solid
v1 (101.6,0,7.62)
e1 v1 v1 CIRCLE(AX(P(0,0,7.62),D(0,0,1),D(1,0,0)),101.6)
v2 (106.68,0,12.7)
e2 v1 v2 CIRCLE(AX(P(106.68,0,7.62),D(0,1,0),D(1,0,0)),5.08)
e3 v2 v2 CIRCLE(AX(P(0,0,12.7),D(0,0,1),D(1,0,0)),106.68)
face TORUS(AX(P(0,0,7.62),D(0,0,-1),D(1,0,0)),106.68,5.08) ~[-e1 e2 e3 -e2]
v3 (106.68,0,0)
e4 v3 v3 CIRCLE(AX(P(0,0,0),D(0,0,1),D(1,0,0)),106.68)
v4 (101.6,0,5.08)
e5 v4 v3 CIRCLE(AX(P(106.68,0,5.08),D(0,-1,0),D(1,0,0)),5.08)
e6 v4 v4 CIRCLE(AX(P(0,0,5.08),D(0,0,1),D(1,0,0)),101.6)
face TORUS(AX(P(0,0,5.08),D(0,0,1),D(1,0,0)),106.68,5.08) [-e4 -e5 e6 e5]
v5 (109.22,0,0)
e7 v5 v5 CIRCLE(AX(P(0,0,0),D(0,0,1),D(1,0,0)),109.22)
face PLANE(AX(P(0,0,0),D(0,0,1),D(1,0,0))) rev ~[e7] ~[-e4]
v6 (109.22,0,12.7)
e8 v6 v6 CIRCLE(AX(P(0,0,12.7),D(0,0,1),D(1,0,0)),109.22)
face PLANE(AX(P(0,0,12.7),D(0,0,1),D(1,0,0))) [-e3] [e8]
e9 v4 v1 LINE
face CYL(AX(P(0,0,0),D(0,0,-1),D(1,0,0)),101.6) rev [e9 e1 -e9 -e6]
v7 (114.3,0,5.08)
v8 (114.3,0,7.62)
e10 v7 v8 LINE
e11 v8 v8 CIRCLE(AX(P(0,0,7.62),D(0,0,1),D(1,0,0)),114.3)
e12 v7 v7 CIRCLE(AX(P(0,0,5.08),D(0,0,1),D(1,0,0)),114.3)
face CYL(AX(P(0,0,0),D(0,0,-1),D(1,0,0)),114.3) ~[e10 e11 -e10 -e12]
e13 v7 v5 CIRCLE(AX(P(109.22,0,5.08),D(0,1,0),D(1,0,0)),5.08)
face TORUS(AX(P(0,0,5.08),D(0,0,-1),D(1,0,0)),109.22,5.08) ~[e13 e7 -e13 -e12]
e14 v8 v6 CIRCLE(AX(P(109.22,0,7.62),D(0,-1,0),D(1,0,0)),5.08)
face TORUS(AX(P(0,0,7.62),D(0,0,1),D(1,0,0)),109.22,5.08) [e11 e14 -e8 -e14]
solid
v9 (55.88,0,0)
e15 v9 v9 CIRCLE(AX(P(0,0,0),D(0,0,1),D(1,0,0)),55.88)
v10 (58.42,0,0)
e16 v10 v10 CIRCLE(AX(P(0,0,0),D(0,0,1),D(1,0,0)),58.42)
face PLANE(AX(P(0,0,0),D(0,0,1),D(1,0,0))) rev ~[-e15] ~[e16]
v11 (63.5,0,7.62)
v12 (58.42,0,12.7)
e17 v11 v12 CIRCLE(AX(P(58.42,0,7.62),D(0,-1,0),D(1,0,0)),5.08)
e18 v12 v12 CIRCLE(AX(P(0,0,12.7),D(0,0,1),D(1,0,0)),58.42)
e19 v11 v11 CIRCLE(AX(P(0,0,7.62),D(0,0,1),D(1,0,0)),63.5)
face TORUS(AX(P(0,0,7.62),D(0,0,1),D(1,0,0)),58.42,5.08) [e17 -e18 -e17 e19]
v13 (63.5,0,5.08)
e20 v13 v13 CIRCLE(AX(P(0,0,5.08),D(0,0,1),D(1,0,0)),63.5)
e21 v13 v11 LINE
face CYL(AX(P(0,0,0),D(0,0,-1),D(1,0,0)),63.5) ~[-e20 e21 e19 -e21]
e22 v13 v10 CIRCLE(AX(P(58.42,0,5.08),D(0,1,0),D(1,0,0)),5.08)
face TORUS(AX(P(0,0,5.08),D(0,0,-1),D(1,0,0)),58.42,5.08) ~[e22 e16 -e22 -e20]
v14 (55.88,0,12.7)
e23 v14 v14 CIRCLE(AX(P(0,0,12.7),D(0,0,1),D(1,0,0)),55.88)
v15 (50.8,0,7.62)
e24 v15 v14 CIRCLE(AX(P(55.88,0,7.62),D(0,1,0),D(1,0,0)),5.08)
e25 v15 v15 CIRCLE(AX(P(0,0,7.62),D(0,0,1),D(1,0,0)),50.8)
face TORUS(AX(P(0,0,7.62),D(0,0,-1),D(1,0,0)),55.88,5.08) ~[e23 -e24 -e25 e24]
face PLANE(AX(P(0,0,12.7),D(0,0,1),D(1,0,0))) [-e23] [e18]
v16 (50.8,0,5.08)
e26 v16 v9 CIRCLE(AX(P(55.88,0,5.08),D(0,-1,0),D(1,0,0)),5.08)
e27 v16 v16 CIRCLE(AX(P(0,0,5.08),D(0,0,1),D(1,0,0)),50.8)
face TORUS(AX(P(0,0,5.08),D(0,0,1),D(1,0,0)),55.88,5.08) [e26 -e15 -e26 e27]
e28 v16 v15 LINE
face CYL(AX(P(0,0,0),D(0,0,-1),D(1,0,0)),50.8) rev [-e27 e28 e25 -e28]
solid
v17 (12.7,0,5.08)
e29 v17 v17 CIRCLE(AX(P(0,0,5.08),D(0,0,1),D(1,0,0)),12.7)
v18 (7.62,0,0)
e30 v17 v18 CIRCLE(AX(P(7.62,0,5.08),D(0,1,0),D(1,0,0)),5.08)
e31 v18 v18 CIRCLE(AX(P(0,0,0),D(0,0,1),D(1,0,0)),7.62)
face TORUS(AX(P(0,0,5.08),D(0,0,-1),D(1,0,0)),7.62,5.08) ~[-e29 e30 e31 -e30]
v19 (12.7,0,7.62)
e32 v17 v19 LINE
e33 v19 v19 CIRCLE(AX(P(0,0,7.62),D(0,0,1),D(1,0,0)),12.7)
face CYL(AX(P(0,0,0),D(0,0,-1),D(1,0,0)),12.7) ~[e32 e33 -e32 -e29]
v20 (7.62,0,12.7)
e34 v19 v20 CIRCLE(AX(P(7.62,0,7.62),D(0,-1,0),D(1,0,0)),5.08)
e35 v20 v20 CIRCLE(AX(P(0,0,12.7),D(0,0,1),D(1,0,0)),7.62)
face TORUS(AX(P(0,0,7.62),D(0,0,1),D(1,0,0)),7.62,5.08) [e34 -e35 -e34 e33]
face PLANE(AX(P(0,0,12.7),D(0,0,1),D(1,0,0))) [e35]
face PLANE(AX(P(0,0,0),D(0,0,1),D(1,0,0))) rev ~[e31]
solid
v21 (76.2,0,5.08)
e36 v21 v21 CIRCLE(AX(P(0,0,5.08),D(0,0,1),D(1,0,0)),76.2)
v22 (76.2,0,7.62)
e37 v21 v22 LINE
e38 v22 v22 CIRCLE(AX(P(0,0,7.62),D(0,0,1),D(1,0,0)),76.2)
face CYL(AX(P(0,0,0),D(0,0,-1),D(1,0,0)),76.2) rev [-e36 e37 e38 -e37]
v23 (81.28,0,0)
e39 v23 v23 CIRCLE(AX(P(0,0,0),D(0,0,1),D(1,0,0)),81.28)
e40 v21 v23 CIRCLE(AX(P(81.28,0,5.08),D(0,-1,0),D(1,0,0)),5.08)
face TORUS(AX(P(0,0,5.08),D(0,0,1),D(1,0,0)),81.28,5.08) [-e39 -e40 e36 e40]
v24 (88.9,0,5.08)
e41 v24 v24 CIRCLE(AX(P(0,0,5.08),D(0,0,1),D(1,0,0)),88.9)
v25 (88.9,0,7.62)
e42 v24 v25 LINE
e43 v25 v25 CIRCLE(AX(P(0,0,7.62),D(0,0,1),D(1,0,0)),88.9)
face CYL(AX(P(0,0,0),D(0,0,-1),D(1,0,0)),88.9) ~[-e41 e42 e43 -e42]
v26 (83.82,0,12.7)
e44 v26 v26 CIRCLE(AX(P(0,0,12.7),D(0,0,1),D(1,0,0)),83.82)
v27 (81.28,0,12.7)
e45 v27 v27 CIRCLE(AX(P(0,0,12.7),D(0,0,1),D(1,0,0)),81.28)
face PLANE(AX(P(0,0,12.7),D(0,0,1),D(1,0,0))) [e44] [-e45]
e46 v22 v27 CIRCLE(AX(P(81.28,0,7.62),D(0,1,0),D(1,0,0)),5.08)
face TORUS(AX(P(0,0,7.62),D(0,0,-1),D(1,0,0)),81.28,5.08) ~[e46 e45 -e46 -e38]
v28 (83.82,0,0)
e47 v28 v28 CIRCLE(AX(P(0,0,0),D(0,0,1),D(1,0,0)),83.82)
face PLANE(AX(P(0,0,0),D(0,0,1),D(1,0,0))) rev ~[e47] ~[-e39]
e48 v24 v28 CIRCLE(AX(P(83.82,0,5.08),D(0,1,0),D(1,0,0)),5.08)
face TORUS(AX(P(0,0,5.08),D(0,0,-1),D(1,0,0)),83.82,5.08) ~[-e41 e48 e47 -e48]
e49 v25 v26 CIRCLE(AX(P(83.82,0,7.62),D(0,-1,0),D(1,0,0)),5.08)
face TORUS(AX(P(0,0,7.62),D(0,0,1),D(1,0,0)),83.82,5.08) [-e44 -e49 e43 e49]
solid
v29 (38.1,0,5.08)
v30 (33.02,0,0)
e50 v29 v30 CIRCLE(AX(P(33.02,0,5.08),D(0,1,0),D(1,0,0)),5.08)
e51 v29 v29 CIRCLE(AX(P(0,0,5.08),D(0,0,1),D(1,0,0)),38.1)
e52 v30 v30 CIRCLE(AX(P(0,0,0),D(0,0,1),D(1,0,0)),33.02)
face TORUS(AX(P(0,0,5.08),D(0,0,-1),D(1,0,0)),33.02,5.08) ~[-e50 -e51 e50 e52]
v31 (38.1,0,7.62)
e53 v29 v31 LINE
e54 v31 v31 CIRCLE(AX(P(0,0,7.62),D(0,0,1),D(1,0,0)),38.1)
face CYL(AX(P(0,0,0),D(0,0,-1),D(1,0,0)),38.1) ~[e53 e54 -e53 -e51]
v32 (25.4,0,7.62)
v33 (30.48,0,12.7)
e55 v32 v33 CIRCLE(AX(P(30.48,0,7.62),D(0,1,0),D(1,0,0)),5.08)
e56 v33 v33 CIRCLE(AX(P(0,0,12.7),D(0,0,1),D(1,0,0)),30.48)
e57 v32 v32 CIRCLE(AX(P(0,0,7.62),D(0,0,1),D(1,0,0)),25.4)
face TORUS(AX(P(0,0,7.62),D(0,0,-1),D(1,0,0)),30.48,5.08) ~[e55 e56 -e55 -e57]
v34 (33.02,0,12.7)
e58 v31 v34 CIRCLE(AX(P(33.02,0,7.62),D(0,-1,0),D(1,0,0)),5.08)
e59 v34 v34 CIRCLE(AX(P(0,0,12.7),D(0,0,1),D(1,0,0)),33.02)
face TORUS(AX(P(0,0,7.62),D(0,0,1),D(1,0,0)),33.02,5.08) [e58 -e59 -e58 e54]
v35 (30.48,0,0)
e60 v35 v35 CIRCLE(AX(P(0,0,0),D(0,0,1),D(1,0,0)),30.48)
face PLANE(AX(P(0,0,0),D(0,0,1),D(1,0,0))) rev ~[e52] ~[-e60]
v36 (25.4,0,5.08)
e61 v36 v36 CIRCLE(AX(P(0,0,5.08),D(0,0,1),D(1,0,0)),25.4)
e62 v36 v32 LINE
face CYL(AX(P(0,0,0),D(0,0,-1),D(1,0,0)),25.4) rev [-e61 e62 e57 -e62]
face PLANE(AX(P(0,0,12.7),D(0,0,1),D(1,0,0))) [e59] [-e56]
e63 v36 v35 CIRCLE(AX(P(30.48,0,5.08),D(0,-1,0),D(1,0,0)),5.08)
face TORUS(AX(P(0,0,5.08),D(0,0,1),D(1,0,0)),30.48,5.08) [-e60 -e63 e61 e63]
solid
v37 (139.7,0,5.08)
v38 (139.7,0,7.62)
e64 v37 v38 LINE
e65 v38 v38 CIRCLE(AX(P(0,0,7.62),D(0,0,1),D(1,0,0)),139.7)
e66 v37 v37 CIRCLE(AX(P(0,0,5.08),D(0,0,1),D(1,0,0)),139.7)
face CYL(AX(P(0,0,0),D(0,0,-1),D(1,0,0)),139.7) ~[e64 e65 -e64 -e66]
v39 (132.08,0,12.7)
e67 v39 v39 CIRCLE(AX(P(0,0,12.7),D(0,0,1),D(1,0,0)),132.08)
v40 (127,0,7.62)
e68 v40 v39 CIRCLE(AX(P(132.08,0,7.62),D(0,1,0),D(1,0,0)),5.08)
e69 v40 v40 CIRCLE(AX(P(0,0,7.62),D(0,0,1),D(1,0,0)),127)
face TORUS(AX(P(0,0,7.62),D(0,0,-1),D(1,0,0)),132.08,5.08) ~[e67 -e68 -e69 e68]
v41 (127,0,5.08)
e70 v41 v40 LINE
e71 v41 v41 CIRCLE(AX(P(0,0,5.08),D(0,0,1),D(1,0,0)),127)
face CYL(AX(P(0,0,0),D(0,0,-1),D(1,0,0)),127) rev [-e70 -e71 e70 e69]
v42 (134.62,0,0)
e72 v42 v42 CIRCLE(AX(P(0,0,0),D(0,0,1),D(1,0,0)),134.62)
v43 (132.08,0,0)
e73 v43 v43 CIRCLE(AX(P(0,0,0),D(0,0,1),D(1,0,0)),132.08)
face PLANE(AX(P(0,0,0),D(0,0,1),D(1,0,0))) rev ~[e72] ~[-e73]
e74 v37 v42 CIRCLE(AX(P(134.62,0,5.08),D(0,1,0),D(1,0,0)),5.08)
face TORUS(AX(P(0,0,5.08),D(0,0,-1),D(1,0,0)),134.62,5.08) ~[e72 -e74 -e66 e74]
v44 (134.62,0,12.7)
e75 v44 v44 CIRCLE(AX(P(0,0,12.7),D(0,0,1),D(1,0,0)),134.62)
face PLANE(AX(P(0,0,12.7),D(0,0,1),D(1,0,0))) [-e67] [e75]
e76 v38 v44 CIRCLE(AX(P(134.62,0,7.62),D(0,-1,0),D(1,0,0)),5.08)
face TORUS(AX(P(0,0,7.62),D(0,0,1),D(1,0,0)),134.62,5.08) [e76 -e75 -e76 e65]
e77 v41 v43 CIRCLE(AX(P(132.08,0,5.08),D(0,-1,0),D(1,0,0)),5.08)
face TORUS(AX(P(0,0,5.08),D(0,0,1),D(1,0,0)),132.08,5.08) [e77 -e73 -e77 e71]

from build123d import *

# Parameters (mm, degrees)
F0_R     = 139.7
F0_R_2   = 127
F1_DEPTH = 12.7
F0_R_3   = 114.3
F0_R_4   = 101.6
F0_R_5   = 88.9
F0_R_6   = 76.2
F0_R_7   = 63.5
F0_R_8   = 50.8
F0_R_9   = 38.1
F0_R_10  = 25.4
F0_R_11  = 12.7
F2_R     = 5.08
F3_R     = 5.08
F4_R     = 5.08
F5_R     = 5.08
F6_R     = 5.08
F6_2_R   = 5.08


# Not quite as in the source:
# - a feature names something its author has since deleted; it is built from what else it names


with BuildPart() as f1:
    # F0 (on Top) → F1 (new body)
    with BuildSketch(Plane.XY):
        Circle(F0_R)
        Circle(F0_R_2, mode=Mode.SUBTRACT)
    extrude(amount=F1_DEPTH)

    # F6
    f6_edges = [f1.edges().sort_by_distance(p)[0] for p in [
        (-139.7, 0, 12.7),
        (-127, 0, 12.7),
        (-139.7, 0, 0),
        (-127, 0, 0),
        (127, 0, 6.35),
        (139.7, 0, 6.35),
    ]]
    fillet(f6_edges, radius=F6_R)


with BuildPart() as f1b:
    # F0 (on Top) → F1, piece 2 (new body)
    with BuildSketch(Plane.XY):
        Circle(F0_R_3)
        Circle(F0_R_4, mode=Mode.SUBTRACT)
    extrude(amount=F1_DEPTH)

    # F6#2
    f6_2_edges = [f1b.edges().sort_by_distance(p)[0] for p in [
        (101.6, 0, 6.35),
        (-101.6, 0, 0),
        (-101.6, 0, 12.7),
        (-114.3, 0, 0),
        (-114.3, 0, 12.7),
        (114.3, 0, 6.35),
    ]]
    fillet(f6_2_edges, radius=F6_2_R)


with BuildPart() as f1c:
    # F0 (on Top) → F1, piece 3 (new body)
    with BuildSketch(Plane.XY):
        Circle(F0_R_5)
        Circle(F0_R_6, mode=Mode.SUBTRACT)
    extrude(amount=F1_DEPTH)

    # F5
    f5_edges = [f1c.edges().sort_by_distance(p)[0] for p in [
        (76.2, 0, 6.35),
        (-76.2, 0, 0),
        (-76.2, 0, 12.7),
        (-88.9, 0, 12.7),
        (-88.9, 0, 0),
        (88.9, 0, 6.35),
    ]]
    fillet(f5_edges, radius=F5_R)


with BuildPart() as f1d:
    # F0 (on Top) → F1, piece 4 (new body)
    with BuildSketch(Plane.XY):
        Circle(F0_R_7)
        Circle(F0_R_8, mode=Mode.SUBTRACT)
    extrude(amount=F1_DEPTH)

    # F4
    f4_edges = [f1d.edges().sort_by_distance(p)[0] for p in [
        (-63.5, 0, 12.7),
        (-50.8, 0, 12.7),
        (50.8, 0, 6.35),
        (-50.8, 0, 0),
        (-63.5, 0, 0),
        (63.5, 0, 6.35),
    ]]
    fillet(f4_edges, radius=F4_R)


with BuildPart() as f1e:
    # F0 (on Top) → F1, piece 5 (new body)
    with BuildSketch(Plane.XY):
        Circle(F0_R_9)
        Circle(F0_R_10, mode=Mode.SUBTRACT)
    extrude(amount=F1_DEPTH)

    # F3
    f3_edges = [f1e.edges().sort_by_distance(p)[0] for p in [
        (38.1, 0, 6.35),
        (-38.1, 0, 0),
        (-38.1, 0, 12.7),
        (-25.4, 0, 12.7),
        (-25.4, 0, 0),
        (25.4, 0, 6.35),
    ]]
    fillet(f3_edges, radius=F3_R)


with BuildPart() as f1f:
    # F0 (on Top) → F1, piece 6 (new body)
    with BuildSketch(Plane.XY):
        Circle(F0_R_11)
    extrude(amount=F1_DEPTH)

    # F2
    f2_edges = [f1f.edges().sort_by_distance(p)[0] for p in [
        (-12.7, 0, 0),
        (12.7, 0, 6.35),
        (-12.7, 0, 12.7),
    ]]
    fillet(f2_edges, radius=F2_R)


solid = Compound([f1.part, f1b.part, f1c.part, f1d.part, f1e.part, f1f.part])
